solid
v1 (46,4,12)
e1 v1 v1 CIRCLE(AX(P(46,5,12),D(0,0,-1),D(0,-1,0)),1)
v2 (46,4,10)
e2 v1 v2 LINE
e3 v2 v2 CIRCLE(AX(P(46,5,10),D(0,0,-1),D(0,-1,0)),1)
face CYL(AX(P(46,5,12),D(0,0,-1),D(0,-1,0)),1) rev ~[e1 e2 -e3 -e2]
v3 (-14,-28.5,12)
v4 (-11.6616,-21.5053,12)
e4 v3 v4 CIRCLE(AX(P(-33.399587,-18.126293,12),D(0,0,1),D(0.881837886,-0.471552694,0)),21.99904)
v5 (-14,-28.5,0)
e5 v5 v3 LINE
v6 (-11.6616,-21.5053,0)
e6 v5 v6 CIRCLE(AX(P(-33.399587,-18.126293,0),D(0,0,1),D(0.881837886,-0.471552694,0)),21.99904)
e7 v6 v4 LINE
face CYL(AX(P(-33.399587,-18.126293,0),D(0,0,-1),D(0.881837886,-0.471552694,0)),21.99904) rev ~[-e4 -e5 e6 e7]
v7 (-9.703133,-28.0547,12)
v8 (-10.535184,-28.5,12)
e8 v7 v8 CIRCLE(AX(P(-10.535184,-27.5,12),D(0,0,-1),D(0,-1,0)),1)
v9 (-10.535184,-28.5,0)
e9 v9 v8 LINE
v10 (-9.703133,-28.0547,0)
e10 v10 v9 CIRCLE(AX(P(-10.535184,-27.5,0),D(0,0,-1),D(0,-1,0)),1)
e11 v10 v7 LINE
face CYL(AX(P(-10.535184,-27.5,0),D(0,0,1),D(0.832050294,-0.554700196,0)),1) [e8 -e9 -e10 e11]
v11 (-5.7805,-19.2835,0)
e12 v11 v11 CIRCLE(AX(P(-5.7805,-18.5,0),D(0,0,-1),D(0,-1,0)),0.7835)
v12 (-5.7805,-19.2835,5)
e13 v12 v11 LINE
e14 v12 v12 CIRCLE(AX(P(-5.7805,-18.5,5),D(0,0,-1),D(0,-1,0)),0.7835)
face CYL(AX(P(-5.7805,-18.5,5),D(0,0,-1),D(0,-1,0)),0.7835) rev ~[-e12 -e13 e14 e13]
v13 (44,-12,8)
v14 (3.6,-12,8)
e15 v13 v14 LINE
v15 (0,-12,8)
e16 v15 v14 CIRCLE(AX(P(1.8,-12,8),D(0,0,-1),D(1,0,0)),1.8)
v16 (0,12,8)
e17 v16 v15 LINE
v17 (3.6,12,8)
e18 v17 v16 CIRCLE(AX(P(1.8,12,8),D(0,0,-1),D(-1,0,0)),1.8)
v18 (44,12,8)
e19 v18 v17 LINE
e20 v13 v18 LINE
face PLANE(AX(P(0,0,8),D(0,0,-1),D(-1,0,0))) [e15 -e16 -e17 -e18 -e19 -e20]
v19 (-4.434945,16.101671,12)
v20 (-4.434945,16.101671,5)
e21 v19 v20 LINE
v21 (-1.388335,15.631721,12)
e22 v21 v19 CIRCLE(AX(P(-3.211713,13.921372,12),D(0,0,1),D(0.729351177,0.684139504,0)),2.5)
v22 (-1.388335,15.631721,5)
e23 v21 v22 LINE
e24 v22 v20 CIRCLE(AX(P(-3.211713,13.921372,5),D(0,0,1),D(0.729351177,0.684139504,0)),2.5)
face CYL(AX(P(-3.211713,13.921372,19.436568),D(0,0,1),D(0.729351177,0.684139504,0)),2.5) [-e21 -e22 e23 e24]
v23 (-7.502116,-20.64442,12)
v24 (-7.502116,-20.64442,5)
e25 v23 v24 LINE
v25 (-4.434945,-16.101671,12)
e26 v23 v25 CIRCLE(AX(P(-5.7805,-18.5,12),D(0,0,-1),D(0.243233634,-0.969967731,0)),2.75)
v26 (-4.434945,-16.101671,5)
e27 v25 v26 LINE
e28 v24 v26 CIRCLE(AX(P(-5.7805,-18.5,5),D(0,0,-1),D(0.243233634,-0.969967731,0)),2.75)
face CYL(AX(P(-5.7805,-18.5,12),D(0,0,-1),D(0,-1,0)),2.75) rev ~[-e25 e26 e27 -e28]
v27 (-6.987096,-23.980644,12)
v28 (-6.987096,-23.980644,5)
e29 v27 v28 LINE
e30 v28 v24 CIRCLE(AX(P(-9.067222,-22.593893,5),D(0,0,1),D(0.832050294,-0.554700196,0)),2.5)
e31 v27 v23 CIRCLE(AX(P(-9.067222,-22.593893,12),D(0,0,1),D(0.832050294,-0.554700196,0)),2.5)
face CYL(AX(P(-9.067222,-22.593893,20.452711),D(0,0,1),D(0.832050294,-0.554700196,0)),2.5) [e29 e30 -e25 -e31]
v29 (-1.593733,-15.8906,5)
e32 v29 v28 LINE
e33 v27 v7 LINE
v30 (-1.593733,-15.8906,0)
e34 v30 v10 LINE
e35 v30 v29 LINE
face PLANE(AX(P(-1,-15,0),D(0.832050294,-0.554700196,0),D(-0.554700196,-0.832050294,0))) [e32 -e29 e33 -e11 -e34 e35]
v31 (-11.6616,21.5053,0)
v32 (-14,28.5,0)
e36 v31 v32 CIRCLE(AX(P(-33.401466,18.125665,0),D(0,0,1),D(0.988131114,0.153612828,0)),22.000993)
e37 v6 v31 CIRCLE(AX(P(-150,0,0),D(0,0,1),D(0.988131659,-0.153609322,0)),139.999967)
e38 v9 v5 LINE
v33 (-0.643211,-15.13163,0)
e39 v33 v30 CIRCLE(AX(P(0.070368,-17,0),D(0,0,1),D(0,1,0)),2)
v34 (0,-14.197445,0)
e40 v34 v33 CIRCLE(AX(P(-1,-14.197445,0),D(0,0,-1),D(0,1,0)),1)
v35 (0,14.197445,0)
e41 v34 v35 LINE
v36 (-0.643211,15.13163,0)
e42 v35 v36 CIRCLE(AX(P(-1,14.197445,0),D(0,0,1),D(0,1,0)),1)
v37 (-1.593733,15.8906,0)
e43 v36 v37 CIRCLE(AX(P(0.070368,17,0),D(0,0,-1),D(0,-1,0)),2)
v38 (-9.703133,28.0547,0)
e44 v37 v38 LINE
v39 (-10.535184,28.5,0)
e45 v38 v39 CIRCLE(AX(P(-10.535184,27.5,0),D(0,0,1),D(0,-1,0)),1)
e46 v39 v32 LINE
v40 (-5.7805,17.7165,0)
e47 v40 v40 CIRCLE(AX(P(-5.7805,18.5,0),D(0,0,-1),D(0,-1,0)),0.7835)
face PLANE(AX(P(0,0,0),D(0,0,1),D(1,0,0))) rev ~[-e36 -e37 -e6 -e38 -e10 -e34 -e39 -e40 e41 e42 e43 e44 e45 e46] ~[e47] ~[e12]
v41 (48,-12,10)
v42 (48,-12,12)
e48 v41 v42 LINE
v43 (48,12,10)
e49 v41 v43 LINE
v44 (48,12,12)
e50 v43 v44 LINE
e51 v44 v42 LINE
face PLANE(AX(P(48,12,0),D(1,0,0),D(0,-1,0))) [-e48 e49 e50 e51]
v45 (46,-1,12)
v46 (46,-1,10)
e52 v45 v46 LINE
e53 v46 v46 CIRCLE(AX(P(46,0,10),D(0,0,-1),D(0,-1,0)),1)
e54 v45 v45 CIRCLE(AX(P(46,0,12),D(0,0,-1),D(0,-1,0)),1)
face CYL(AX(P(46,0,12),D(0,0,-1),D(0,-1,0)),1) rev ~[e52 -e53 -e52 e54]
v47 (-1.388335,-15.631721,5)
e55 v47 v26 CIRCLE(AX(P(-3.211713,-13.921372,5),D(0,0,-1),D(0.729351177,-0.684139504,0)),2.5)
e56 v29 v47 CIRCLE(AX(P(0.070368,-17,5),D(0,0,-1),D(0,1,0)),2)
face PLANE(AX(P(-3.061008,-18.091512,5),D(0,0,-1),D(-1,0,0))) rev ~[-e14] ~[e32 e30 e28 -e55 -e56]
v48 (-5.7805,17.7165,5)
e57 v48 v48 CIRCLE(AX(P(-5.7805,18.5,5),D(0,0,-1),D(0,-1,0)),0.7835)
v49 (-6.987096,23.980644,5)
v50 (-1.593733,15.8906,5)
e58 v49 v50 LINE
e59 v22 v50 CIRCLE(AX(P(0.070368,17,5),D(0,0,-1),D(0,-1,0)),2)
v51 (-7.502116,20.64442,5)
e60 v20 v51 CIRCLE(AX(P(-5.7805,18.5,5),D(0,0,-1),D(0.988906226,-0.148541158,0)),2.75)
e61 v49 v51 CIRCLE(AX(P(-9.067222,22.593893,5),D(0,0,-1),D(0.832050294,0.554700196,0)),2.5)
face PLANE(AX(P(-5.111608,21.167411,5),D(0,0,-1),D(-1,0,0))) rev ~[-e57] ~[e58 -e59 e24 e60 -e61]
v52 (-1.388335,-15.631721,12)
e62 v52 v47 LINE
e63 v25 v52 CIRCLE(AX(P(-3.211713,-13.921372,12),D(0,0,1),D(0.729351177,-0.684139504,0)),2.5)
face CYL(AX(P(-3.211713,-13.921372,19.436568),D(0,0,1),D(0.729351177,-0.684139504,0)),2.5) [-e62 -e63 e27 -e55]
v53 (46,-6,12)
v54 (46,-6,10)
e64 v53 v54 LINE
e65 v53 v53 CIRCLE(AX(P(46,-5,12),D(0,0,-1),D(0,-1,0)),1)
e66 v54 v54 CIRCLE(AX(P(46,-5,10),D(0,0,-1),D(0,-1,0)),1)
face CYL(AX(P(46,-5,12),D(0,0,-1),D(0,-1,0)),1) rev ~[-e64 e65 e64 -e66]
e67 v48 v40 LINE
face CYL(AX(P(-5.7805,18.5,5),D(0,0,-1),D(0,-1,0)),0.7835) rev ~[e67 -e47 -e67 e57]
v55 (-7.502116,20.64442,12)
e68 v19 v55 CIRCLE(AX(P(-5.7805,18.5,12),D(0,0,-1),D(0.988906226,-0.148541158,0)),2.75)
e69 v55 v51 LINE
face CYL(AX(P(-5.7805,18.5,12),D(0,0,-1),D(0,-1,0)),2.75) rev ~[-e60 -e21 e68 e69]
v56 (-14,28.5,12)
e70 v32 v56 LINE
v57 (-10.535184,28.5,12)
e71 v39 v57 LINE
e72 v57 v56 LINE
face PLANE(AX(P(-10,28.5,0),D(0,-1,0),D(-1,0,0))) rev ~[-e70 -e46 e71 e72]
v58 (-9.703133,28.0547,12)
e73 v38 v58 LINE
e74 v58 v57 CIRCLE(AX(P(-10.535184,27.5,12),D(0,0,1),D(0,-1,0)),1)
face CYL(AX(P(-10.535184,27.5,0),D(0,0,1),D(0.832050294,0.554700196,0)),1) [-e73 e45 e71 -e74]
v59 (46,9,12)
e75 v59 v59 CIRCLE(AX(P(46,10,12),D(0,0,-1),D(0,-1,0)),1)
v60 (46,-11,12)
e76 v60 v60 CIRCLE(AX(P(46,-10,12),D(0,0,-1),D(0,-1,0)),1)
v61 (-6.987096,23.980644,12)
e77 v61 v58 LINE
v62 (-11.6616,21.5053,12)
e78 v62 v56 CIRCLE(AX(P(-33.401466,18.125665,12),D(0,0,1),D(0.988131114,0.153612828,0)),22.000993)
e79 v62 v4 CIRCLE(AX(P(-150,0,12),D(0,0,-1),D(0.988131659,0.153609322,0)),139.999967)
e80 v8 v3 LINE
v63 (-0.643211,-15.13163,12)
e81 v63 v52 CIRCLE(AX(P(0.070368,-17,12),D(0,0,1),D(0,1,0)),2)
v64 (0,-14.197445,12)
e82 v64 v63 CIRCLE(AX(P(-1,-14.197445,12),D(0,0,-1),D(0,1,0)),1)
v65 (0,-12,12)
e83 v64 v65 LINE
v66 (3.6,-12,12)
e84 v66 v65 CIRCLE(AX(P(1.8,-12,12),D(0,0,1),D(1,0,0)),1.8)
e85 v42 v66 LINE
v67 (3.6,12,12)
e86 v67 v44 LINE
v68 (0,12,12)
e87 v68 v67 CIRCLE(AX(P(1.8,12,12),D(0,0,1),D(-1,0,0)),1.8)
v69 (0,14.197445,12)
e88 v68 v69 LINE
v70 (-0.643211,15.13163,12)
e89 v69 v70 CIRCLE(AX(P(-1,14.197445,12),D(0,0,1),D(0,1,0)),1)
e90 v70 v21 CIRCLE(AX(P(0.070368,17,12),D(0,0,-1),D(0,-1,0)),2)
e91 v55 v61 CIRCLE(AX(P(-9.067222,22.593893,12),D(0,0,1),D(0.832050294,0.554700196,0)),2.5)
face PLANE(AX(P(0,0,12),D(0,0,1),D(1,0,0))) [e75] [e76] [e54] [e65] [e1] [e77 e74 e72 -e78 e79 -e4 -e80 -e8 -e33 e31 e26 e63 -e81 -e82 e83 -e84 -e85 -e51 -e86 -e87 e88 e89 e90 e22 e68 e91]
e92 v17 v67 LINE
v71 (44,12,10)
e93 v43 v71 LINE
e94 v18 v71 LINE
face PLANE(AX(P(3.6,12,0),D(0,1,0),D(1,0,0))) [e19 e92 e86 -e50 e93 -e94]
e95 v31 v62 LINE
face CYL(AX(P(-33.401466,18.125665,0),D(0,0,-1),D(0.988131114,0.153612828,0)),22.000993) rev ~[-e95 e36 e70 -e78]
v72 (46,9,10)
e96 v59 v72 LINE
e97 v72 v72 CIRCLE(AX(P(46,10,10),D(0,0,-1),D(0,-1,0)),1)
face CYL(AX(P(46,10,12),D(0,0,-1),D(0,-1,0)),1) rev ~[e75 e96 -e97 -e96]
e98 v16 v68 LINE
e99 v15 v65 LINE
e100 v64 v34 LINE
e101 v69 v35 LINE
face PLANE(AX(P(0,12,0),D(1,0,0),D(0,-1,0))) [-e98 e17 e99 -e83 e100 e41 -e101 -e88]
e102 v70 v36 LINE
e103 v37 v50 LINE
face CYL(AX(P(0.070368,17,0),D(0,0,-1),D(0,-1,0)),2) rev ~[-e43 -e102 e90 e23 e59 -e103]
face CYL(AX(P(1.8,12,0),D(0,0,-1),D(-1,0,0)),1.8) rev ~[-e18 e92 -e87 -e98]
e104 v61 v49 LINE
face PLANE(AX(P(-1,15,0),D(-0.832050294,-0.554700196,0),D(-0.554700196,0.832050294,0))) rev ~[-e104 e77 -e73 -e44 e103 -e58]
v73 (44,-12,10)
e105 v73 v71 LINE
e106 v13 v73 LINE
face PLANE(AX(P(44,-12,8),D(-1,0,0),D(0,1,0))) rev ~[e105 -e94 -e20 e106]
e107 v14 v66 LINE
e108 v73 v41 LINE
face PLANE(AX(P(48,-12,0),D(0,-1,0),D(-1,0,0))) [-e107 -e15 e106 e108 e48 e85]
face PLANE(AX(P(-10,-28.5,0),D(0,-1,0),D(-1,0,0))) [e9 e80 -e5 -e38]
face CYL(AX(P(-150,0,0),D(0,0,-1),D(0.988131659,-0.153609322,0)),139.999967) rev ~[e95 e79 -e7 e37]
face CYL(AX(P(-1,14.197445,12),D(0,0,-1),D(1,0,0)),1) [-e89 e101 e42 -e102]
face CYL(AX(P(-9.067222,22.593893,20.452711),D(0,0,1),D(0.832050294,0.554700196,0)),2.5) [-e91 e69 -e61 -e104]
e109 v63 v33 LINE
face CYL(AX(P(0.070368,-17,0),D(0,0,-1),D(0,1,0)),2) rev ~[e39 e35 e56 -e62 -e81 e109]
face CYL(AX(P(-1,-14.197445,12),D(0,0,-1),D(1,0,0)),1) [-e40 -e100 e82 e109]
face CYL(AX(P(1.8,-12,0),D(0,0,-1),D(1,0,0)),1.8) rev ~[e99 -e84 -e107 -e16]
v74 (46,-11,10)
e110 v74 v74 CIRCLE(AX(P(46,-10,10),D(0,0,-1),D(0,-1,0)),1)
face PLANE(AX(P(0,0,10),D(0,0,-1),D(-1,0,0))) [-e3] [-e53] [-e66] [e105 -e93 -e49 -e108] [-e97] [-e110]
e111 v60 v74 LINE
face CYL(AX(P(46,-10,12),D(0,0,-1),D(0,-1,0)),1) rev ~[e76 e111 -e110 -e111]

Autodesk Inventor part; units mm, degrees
ref_plane "YZ Plane" through (0, 0, 0) normal (1, 0, 0) x (0, 1, 0)
ref_plane "XZ Plane" through (0, 0, 0) normal (0, 1, 0) x (-1, 0, 0)
ref_plane "XY Plane" through (0, 0, 0) normal (0, 0, 1) x (1, 0, 0)
sketch "Skizze1" plane through (0, 0, 0) normal (0, 0, 1) x (1, 0, 0)
  line L0 (3.6, 12) -> (48, 12)
  line L1 (48, 12) -> (48, -12)
  line L2 (48, -12) -> (3.6, -12)
  line L3 (-189.6, 0) -> (87.6, 0) projected
  line L4 (-1, 15) -> (-10, 28.5)
  line L5 (-1, -15) -> (-10, -28.5)
  line L6 (-10, -28.5) -> (-14, -28.5)
  line L7 (-10, 28.5) -> (-14, 28.5)
  arc A0 (-11.6616, 21.5053) -> (-14, 28.5) centre (-33.4005, 18.1259) ccw
  arc A1 (-14, -28.5) -> (-11.6616, -21.5053) centre (-33.4005, -18.1259) ccw
  arc A2 (-11.6616, -21.5053) -> (-11.6616, 21.5053) centre (-150, 0) ccw
  line L8 (-10, 28.5) -> (-10, -28.5) construction
  line L9 (0, 40.0382) -> (0, -40.0382) projected
  line L10 (-2, 12.5) -> (-2, -9.8115) construction
  arc A3 (0, 12) -> (3.6, 12) centre (1.8, 12) ccw
  arc A4 (3.6, -12) -> (0, -12) centre (1.8, -12) ccw
  line L11 (0, 12) -> (0, 15)
  line L12 (0, 15) -> (-1, 15)
  line L13 (0, -12) -> (0, -15)
  line L14 (0, -15) -> (-1, -15)
  point P0 (0, 0)
  dimension "d2" = 24
  dimension "d51" = 22
  dimension "d52" = 140
  dimension "d54" = 4
  dimension "d55" = 57
  dimension "d59" = 8
  dimension "d60" = 2
  dimension "d64" = 0
  dimension "d73" = 1.8
  dimension "d75" = 48
  dimension "d76" = 30
  dimension "d77" = 1
extrude "Extrusion1" add sketch "Skizze1" along normal blind 12
sketch "Skizze8" plane through (0, 0, 12) normal (0, 0, 1) x (1, 0, 0)
  line L0 (-189.6, 0) -> (87.6, 0) projected
  arc A0 (-11.6616, -21.5053) -> (-11.6616, 21.5053) centre (-150, 0) ccw projected
  line L1 (-1, 15) -> (-10, 28.5) projected
  line L2 (-11.2277, 18.5) -> (-3.3333, 18.5) construction
  point P0 (0, 0)
  point P1 (-5.7805, 18.5)
  point P2 (-5.7805, -18.5)
  point P3 (-7.2805, 18.5)
  dimension "d65" = 18.5
  dimension "d80" = 1.5
hole "Bohrung4" at (-5.7805, 18.5, 12) at (-5.7805, -18.5, 12) direction (0, 0, -1) diameter 1.567 end through all counterbore diameter 5.5 counterbore depth 7 thread size "M2x0.4" class "6H" standard "ISO Metric profile"
sketch "Skizze2" plane through (0, 0, 0) normal (0, 0, -1) x (-1, 0, 0)
  line L0 (-48, -12) -> (-3.6, -12) projected
  line L1 (-48, 12) -> (-48, -12) projected
  line L2 (-48, 12) -> (-3.6, 12) projected
  line L3 (0, -12) -> (-48, -12)
  line L4 (-48, -12) -> (-48, 12)
  line L5 (-48, 12) -> (0, 12)
  line L6 (-3.6, 12) -> (-48, 12) projected
  line L7 (0, 12) -> (0, -12)
  point P0 (0, 0)
  point P1 (0, -12.5)
  point P2 (0, 12.5)
  point P3 (-3.6, -12)
extrude "Extrusion2" cut sketch "Skizze2" against normal blind 8
sketch "Skizze3" plane through (0, 0, 8) normal (0, 0, -1) x (-1, 0, 0)
  line L0 (-3.6, -12) -> (-48, -12) projected
  line L1 (-48, -12) -> (-48, 12) projected
  line L2 (-48, 12) -> (-3.6, 12) projected
  line L3 (-48, -12) -> (-44, -12)
  line L4 (-44, -12) -> (-44, 12)
  line L5 (-44, 12) -> (-48, 12)
  line L6 (-48, 12) -> (-48, -12)
  point P0 (0, 0)
  point P1 (0, -12.5)
  point P2 (0, 12.5)
  point P3 (10, -12.5)
  point P4 (-3.6, 12)
  dimension "d9" = 4
extrude "Extrusion3" cut sketch "Skizze3" against normal blind 2
sketch "Skizze4" plane through (0, 0, 12) normal (0, 0, 1) x (1, 0, 0)
  line L0 (48, -12) -> (48, 12) projected
  line L1 (-26.4, 0) -> (60.4, 0) projected
  point P0 (0, 0)
  point P1 (46, 0)
  dimension "d12" = 2
hole "Bohrung1" at (46, 0, 12) direction (0, 0, -1) diameter 2 end through all
pattern_linear "Rechteckige Anordnung1" count 5 spacing 5 along (0, 1, 0) of "Bohrung1" first direction both ways yes
sketch "Skizze7" plane through (0, 0, 12) normal (0, 0, 1) x (1, 0, 0)
  line L0 (-1, 15) -> (-3.061, 18.0915) projected
  line L1 (-10, 28.5) -> (-14, 28.5) projected
  arc A0 (-11.6616, 21.5053) -> (-14, 28.5) centre (-33.4005, 18.1259) ccw projected
  arc A1 (-11.6616, -21.5053) -> (-11.6616, 21.5053) centre (-150, 0) ccw projected
  arc A2 (-14, -28.5) -> (-11.6616, -21.5053) centre (-33.4005, -18.1259) ccw projected
  line L2 (-14, -28.5) -> (-10, -28.5) projected
  line L3 (-10, -28.5) -> (-5.1116, -21.1674) projected
  line L4 (3.6, -12) -> (48, -12) projected
  line L5 (48, -12) -> (48, 12) projected
  line L6 (48, 12) -> (3.6, 12) projected
  line L7 (-3, 28.5) -> (-14, 28.5)
  line L8 (-14, 28.5) -> (-14, -28.5)
  line L9 (-14, -28.5) -> (-3, -28.5)
  line L10 (-3, -28.5) -> (-3, 28.5)
  line L11 (-10, 28.5) -> (-14, 28.5) projected
  line L12 (-14, -28.5) -> (-10, -28.5) projected
  line L13 (0, 12) -> (0, 15) projected
  line L14 (0, 15) -> (-1, 15) projected
  line L15 (-1, -15) -> (0, -15) projected
  line L16 (0, -15) -> (0, -12) projected
  arc A3 (3.6, -12) -> (0, -12) centre (1.8, -12) ccw projected
  arc A4 (0, 12) -> (3.6, 12) centre (1.8, 12) ccw projected
  arc A5 (-5.1116, 21.1674) -> (-3.061, 18.0915) centre (-5.7805, 18.5) ccw projected
  arc A6 (-3.061, -18.0915) -> (-5.1116, -21.1674) centre (-5.7805, -18.5) ccw projected
  line L17 (-1, -15) -> (0, -15) projected
  line L18 (0, 15) -> (-1, 15) projected
  line L19 (-194.4, 0) -> (88.4, 0) projected
  line L20 (-1, 15) -> (-2, 15)
  line L21 (0, -15) -> (-1, -15) projected
  line L22 (-2, -15) -> (-1, -15)
  line L23 (-5.1116, 21.1674) -> (-10, 28.5) projected
  line L24 (-3.061, -18.0915) -> (-1, -15) projected
  point P0 (0.6841, -13.8749)
  point P1 (0, 0)
  point P2 (-3, -14)
  point P3 (-3, 14)
  dimension "d86" = 3
extrude "Extrusion4" [suppressed]
fillet "Rundung1" radius 2 2 edges at (-1, -15, 6) (-1, 15, 6)
fillet "Rundung2" radius 1 4 edges at (-10, -28.5, 6) (-10, 28.5, 6) (0, -15.0012, 6) (0, 15.0012, 6)
fillet "Rundung3" radius 2.5 4 edges at (-5.1116, -21.1674, 8.5) (-3.061, -18.0915, 8.5) (-5.1116, 21.1674, 8.5) (-3.061, 18.0915, 8.5)
chamfer "Fase1" [suppressed]
sketch "Skizze9" plane through (0, 0, 7) normal (0, 0, 1) x (1, 0, 0)
  arc A0 (-10.4764, 20.7604) -> (-7.2043, 16.343) centre (-8.9101, 18.5) ccw projected
  line L0 (-12.7002, 28.0952) -> (-9.8914, 24.3034) projected
  arc A1 (-12.7002, 28.0952) -> (-13.5037, 28.5) centre (-13.5037, 27.5) ccw projected
  line L1 (-18, 28.5) -> (-13.5037, 28.5) projected
  arc A2 (-15.6616, 21.5053) -> (-18, 28.5) centre (-37.4005, 18.1259) ccw projected
  arc A3 (-15.6616, -21.5053) -> (-15.6616, 21.5053) centre (-154, 0) ccw projected
  arc A4 (-18, -28.5) -> (-15.6616, -21.5053) centre (-37.4005, -18.1259) ccw projected
  line L2 (-13.5037, -28.5) -> (-18, -28.5) projected
  arc A5 (-13.5037, -28.5) -> (-12.7002, -28.0952) centre (-13.5037, -27.5) ccw projected
  line L3 (-9.8914, -24.3034) -> (-12.7002, -28.0952) projected
  arc A6 (-7.2043, -16.343) -> (-10.4764, -20.7604) centre (-8.9101, -18.5) ccw projected
  line L4 (-3, 12) -> (-4, 12)
  line L5 (-4, 12) -> (-4, -12)
  line L6 (-4, -12) -> (-3, -12)
  line L7 (-3, -12) -> (-3, 12)
  line L8 (-194.4, 0) -> (88.4, 0) projected
  line L9 (-3, 15.2723) -> (-3, -15.2723) projected
  arc A7 (-3, -15.2723) -> (-3.5997, -15.8095) centre (-1.9925, -17) ccw projected
  arc A8 (-3.5997, 15.8095) -> (-3, 15.2723) centre (-1.9925, 17) ccw projected
  arc A9 (-3.6446, 15.8702) -> (-7.2043, 16.343) centre (-5.6535, 14.3821) ccw projected
  arc A10 (-10.4764, 20.7604) -> (-9.8914, 24.3034) centre (-11.9003, 22.8153) ccw projected
  arc A11 (-9.8914, -24.3034) -> (-10.4764, -20.7604) centre (-11.9003, -22.8153) ccw projected
  arc A12 (-7.2043, -16.343) -> (-3.6446, -15.8702) centre (-5.6535, -14.3821) ccw projected
  line L10 (-3.5997, -15.8095) -> (-3.6446, -15.8702) projected
  line L11 (-3.6446, 15.8702) -> (-3.5997, 15.8095) projected
  point P0 (0, 0)
  dimension "d88" = 1
  dimension "d89" = 24
extrude "Extrusion5" [suppressed]
sketch "Skizze10" plane through (0, 0, 7) normal (0, 0, 1) x (1, 0, 0)
  arc A0 (-10.4764, 20.7604) -> (-7.2043, 16.343) centre (-8.9101, 18.5) ccw projected
  arc A1 (-12.7002, 28.0952) -> (-13.5037, 28.5) centre (-13.5037, 27.5) ccw projected
  line L0 (-18, 28.5) -> (-13.5037, 28.5) projected
  arc A2 (-15.6616, 21.5053) -> (-18, 28.5) centre (-37.4005, 18.1259) ccw projected
  arc A3 (-15.6616, -21.5053) -> (-15.6616, 21.5053) centre (-154, 0) ccw projected
  arc A4 (-18, -28.5) -> (-15.6616, -21.5053) centre (-37.4005, -18.1259) ccw projected
  line L1 (-13.5037, -28.5) -> (-18, -28.5) projected
  arc A5 (-13.5037, -28.5) -> (-12.7002, -28.0952) centre (-13.5037, -27.5) ccw projected
  line L2 (-9.8914, -24.3034) -> (-12.7002, -28.0952) projected
  arc A6 (-7.2043, -16.343) -> (-10.4764, -20.7604) centre (-8.9101, -18.5) ccw projected
  line L3 (-4, 12) -> (-5, 12)
  line L4 (-5, 12) -> (-5, -12)
  line L5 (-5, -12) -> (-4, -12)
  line L6 (-4, -12) -> (-4, 12)
  line L7 (-3, 15.2723) -> (-3, -15.2723) projected
  line L8 (-12.7002, 28.0952) -> (-9.8914, 24.3034) projected
  arc A7 (-3.5997, 15.8095) -> (-3, 15.2723) centre (-1.9925, 17) ccw projected
  arc A8 (-3, -15.2723) -> (-3.5997, -15.8095) centre (-1.9925, -17) ccw projected
  line L9 (-3.6446, 15.8702) -> (-3.5997, 15.8095) projected
  arc A9 (-3.6446, 15.8702) -> (-7.2043, 16.343) centre (-5.6535, 14.3821) ccw projected
  arc A10 (-10.4764, 20.7604) -> (-9.8914, 24.3034) centre (-11.9003, 22.8153) ccw projected
  arc A11 (-9.8914, -24.3034) -> (-10.4764, -20.7604) centre (-11.9003, -22.8153) ccw projected
  arc A12 (-7.2043, -16.343) -> (-3.6446, -15.8702) centre (-5.6535, -14.3821) ccw projected
  line L10 (-3.5997, -15.8095) -> (-3.6446, -15.8702) projected
  point P0 (0, 0)
  dimension "d92" = 1
extrude "Extrusion6" [suppressed]
fillet "Rundung4" [suppressed]
chamfer "Fase3" [suppressed]
properties part number "Kicker Sichel" material "Aluminium 6061"
